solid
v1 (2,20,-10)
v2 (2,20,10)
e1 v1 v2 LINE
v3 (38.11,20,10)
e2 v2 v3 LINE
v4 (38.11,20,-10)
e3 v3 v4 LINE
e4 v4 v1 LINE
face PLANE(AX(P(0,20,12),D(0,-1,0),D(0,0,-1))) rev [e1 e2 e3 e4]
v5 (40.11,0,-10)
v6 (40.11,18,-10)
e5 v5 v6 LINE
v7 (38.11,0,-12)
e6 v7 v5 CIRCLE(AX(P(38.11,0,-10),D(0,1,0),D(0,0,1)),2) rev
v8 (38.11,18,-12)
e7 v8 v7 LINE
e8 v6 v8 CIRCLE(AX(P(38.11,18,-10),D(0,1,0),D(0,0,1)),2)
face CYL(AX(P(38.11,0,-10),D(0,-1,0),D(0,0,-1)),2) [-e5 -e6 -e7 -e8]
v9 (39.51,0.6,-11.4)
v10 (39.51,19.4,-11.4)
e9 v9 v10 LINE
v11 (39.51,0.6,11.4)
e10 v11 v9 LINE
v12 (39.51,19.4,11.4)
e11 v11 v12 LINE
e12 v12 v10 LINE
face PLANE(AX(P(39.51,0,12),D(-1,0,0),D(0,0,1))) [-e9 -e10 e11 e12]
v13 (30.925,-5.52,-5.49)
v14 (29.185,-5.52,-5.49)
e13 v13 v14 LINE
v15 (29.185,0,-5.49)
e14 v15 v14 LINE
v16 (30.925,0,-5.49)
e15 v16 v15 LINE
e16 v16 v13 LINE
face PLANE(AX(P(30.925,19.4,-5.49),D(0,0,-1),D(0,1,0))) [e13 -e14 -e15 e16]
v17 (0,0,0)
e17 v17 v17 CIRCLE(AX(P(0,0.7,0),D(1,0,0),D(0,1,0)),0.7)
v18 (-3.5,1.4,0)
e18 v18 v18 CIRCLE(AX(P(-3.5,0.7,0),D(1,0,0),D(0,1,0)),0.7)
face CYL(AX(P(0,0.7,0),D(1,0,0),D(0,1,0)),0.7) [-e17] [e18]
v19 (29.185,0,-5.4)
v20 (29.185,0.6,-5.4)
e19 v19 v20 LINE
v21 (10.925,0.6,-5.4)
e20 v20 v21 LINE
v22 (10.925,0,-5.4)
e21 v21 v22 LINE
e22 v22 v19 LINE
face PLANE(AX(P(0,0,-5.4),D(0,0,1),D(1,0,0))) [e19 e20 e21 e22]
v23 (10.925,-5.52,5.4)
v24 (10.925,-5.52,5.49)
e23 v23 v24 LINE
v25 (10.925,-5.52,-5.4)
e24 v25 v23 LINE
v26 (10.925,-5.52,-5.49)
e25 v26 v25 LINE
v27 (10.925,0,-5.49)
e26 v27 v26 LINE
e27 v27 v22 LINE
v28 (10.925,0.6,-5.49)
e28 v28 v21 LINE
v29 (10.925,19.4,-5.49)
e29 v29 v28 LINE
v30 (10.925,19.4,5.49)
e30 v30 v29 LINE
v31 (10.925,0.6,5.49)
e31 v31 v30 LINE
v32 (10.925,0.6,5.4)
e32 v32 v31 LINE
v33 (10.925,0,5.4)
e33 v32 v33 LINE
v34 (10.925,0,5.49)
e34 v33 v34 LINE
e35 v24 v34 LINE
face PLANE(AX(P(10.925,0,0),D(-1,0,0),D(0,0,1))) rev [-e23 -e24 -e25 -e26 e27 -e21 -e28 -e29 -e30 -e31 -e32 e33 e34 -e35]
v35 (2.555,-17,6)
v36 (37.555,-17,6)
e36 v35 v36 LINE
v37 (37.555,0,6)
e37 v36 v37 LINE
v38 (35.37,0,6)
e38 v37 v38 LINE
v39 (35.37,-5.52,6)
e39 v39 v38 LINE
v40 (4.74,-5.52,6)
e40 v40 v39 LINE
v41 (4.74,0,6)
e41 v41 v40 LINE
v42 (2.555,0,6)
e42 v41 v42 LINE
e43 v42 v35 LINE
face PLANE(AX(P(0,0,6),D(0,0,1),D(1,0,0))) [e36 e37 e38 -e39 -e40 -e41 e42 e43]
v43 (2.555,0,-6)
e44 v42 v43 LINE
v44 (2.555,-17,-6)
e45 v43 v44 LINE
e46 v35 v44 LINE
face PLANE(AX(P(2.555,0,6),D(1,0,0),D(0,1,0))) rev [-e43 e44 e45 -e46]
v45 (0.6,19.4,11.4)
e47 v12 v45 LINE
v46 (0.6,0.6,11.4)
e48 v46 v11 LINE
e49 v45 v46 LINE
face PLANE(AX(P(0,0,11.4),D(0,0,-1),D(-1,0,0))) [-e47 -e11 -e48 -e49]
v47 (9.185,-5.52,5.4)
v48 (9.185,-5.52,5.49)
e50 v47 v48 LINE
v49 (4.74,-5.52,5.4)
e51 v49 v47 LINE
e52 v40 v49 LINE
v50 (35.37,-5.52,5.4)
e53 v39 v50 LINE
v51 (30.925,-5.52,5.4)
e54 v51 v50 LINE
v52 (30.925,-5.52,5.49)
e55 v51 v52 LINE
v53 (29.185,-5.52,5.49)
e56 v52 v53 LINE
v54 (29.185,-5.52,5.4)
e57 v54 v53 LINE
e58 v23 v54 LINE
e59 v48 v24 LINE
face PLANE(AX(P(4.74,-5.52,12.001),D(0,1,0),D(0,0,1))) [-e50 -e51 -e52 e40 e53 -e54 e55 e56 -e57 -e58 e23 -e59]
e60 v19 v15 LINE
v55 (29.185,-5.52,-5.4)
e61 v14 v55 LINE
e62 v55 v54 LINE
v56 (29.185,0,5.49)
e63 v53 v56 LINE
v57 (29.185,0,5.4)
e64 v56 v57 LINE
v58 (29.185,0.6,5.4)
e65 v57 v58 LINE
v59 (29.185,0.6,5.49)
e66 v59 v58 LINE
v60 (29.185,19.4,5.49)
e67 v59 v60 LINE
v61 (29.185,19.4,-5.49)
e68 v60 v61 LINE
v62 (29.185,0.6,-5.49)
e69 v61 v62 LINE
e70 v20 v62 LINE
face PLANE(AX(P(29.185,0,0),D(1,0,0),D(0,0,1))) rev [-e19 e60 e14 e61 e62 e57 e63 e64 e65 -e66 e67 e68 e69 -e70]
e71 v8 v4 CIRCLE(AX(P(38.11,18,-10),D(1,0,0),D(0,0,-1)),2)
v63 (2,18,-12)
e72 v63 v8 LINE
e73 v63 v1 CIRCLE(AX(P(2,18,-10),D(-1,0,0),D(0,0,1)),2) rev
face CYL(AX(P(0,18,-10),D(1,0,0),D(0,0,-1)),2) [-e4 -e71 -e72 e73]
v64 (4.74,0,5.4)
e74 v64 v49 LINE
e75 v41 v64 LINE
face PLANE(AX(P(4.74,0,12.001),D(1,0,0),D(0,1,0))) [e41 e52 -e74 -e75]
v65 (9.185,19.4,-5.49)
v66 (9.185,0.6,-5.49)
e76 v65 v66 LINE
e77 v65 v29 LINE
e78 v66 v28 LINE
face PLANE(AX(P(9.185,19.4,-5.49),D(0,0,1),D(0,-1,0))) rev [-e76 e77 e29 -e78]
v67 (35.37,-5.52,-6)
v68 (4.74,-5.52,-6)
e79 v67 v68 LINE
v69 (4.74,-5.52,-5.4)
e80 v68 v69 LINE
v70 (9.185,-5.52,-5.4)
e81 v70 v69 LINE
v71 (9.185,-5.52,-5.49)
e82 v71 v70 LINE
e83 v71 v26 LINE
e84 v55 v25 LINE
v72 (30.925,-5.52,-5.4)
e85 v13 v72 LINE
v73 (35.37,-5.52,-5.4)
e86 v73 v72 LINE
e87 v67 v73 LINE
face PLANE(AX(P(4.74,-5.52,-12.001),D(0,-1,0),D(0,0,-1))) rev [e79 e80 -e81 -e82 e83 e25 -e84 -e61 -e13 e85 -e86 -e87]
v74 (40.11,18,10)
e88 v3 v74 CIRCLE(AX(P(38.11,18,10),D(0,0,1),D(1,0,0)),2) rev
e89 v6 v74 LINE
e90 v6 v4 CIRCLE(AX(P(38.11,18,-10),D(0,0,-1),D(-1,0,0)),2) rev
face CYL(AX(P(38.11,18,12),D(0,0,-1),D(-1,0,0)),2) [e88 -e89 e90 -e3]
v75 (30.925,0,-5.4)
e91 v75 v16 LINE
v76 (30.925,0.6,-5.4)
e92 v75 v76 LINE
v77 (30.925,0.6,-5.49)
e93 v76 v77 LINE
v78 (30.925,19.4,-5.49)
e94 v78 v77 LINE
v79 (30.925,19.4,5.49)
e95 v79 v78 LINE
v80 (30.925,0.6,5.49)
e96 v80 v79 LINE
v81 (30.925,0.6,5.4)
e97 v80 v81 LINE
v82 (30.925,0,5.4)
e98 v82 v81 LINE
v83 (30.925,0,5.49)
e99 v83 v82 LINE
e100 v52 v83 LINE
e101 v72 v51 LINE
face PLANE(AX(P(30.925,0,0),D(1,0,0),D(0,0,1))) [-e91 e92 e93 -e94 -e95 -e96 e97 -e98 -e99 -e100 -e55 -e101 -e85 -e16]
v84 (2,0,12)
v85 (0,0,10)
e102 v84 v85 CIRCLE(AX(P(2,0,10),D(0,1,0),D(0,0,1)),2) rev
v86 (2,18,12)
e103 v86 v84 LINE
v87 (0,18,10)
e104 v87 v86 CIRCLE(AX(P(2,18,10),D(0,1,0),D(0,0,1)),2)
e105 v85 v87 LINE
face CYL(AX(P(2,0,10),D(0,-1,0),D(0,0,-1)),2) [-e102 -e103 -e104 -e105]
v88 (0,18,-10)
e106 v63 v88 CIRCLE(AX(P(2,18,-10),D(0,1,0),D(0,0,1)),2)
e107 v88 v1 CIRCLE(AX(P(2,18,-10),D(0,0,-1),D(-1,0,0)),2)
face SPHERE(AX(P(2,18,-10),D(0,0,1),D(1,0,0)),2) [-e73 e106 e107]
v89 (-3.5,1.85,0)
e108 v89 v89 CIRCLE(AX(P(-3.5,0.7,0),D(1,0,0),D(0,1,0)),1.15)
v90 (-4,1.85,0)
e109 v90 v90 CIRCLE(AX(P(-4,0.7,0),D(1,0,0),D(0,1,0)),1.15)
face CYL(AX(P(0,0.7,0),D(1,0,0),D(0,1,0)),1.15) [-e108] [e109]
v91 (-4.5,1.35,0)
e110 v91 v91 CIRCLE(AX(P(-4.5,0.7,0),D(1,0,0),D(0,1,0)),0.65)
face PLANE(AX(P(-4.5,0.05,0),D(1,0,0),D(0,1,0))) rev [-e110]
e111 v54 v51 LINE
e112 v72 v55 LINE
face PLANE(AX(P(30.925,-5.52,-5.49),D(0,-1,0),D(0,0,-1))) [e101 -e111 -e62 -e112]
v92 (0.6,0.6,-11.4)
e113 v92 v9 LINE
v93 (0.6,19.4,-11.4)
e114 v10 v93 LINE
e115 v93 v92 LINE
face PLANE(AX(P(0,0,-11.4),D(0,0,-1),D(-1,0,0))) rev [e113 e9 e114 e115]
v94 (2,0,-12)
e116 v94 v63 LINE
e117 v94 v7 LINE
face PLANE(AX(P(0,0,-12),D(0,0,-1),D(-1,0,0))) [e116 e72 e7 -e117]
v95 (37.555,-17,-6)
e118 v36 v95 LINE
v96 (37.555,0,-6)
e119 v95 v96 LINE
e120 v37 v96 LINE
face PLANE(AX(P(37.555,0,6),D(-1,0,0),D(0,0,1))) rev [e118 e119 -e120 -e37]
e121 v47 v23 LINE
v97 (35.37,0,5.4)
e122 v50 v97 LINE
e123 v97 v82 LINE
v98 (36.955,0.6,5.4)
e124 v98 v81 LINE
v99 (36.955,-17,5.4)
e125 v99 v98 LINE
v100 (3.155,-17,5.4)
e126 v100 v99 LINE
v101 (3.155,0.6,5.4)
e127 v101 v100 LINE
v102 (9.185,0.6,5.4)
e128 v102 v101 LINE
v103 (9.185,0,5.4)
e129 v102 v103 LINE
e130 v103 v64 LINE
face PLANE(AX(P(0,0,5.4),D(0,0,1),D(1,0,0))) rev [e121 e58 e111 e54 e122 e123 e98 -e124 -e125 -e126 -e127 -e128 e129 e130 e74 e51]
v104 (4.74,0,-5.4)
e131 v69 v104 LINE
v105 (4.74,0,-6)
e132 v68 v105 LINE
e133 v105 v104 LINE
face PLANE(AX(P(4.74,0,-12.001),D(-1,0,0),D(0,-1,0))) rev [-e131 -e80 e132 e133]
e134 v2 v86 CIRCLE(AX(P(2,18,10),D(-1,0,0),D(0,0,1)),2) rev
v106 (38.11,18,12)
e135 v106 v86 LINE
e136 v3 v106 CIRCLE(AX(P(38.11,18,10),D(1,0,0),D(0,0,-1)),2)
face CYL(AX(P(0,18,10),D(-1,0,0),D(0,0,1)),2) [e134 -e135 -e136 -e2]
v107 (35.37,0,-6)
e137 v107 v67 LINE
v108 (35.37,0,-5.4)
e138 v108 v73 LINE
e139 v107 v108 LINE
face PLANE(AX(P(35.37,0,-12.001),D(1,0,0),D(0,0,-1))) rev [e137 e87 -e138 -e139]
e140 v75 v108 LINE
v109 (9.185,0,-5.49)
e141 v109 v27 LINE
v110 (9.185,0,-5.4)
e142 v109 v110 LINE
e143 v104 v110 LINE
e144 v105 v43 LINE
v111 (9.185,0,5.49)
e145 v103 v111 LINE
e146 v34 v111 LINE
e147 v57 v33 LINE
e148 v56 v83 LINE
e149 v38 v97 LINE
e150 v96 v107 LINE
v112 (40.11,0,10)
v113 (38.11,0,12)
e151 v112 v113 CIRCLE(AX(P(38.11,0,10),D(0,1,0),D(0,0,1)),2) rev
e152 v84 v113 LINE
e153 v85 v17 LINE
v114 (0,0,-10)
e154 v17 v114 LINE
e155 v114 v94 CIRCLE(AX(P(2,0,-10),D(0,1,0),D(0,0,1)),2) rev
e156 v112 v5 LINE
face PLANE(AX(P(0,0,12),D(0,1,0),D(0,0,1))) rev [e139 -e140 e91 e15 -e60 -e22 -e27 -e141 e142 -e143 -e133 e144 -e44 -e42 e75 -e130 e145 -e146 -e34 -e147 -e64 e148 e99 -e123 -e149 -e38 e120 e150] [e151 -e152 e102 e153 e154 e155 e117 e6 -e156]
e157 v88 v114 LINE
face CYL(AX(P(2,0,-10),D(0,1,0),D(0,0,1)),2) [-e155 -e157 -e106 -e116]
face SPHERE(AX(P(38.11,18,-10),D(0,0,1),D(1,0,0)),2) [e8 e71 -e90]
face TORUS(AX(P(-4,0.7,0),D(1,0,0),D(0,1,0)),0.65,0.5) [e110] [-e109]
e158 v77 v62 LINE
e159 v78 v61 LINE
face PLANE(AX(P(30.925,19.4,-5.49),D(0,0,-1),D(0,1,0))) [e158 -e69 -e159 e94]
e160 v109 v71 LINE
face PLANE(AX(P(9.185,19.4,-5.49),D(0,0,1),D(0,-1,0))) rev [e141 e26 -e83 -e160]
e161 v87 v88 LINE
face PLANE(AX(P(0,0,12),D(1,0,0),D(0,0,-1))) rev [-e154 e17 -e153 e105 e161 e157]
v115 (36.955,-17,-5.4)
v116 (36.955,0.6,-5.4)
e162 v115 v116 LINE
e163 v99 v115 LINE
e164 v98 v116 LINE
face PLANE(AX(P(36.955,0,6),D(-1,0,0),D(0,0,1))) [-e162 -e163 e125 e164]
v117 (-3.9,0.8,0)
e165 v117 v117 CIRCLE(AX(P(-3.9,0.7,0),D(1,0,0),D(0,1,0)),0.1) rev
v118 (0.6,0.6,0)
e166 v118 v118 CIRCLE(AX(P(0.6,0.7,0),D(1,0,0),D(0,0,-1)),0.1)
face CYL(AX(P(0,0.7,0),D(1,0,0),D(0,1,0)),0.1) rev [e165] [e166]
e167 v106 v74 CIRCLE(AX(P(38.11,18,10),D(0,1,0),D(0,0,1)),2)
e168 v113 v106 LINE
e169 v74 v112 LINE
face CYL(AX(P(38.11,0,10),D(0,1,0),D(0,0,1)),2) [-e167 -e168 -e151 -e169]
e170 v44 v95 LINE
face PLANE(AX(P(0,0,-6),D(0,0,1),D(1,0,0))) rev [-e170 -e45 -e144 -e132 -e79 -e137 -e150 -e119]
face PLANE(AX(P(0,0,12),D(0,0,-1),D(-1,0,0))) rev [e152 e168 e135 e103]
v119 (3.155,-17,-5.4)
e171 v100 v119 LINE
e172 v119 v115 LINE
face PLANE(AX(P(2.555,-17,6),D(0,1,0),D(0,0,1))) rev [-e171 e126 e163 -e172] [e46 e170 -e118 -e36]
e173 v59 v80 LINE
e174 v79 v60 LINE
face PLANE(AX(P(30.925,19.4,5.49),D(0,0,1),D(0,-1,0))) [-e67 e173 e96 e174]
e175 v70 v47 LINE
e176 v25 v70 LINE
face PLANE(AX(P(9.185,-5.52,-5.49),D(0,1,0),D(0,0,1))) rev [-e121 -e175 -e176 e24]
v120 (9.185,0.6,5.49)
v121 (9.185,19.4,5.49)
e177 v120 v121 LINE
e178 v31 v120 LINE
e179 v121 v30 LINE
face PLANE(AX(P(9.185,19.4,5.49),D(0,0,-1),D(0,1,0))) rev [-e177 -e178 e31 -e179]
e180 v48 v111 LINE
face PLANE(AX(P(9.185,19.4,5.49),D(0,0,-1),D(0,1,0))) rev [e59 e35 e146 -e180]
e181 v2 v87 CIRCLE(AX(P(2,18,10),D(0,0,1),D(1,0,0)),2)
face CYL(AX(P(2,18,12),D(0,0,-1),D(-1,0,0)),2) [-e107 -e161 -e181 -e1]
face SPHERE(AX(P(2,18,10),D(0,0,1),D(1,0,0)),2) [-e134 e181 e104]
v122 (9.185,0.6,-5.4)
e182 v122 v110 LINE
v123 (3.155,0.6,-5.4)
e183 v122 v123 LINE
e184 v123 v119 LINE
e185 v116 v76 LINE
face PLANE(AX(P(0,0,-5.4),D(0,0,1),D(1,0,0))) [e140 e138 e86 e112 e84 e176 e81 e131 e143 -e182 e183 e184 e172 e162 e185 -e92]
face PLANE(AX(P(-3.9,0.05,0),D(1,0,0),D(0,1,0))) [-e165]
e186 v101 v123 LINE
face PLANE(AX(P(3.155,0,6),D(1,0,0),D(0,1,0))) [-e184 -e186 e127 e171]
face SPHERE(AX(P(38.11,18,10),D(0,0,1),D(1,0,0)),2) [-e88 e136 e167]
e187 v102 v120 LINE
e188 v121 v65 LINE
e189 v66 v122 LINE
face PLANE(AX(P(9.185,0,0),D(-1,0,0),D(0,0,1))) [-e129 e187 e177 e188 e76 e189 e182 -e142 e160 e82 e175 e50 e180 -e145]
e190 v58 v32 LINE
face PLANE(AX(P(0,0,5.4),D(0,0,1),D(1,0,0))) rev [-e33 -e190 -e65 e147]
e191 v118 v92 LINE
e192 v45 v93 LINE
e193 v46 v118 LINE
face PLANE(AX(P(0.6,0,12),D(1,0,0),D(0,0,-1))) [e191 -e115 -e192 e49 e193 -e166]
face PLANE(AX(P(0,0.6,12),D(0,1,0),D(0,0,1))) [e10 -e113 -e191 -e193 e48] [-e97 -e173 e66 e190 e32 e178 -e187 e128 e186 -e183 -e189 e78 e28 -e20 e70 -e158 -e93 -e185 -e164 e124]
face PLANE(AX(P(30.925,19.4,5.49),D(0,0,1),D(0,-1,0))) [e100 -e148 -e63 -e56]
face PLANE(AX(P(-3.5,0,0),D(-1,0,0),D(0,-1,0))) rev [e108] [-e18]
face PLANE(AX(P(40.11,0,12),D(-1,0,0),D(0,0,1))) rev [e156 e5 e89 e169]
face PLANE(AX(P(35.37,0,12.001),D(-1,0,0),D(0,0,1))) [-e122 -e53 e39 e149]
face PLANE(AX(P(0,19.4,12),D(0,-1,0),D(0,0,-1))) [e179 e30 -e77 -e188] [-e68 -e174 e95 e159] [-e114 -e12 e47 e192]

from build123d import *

# Parameters (mm, degrees)
SKETCH1_W                      = 40.11
SKETCH1_H                      = 20
BOSS_EXTRUDE1_DEPTH            = 12
SKETCH2_W                      = 35
SKETCH2_H                      = 17
BOSS_EXTRUDE2_DEPTH            = 6
SHELL1_START                   = 3.155
SHELL1_DEPTH                   = 33.8
SHELL1_START_2                 = 0.6
SHELL1_2_OUTLINE_W             = 18.8
SHELL1_2_OUTLINE_H             = 22.8
SHELL1_2_DEPTH                 = 38.91
SHELL1_START_3                 = -3.9
SHELL1_3_OUTLINE_R             = 0.1
SHELL1_3_DEPTH                 = 4.5
CUT_EXTRUDE1_REACH             = 48.398
SKETCH4_W                      = 30.63
SKETCH4_H                      = 5.52
CUT_EXTRUDE1_DIRECTION_2_REACH = 48.398
BOSS_EXTRUDE3_START            = 9.13
SKETCH5_W                      = 10.98
SKETCH5_H                      = 24.92
BOSS_EXTRUDE3_DEPTH            = 1.74
FILLET1_R                      = 2


# Read off the part's stored shape, not the designer's step: Shell1
with BuildPart() as part:
    # Sketch1 → Boss-Extrude1 (new, symmetric)
    with BuildSketch(Plane.XY):
        with Locations((20.055, 10)):
            Rectangle(SKETCH1_W, SKETCH1_H)
    extrude(amount=BOSS_EXTRUDE1_DEPTH, both=True)

    # Sketch2 → Boss-Extrude2 (add, symmetric)
    with BuildSketch(Plane.XY):
        with Locations((20.055, -8.5)):
            Rectangle(SKETCH2_W, SKETCH2_H)
    extrude(amount=BOSS_EXTRUDE2_DEPTH, both=True)

    # Sketch3 → Revolve1 (revolve)
    with BuildSketch(Plane.XY, mode=Mode.PRIVATE) as revolve1_sk:
        with BuildLine():
            Line((0, 0), (-3.5, 0))
            Line((-3.5, 0), (-3.5, -0.45))
            Line((-3.5, -0.45), (-4, -0.45))
            ThreePointArc((-4, -0.45), (-4.353553391, -0.303553391), (-4.5, 0.05))
            Line((-4.5, 0.05), (-4.5, 0.7))
            Line((-4.5, 0.7), (0, 0.7))
            Line((0, 0.7), (0, 0))
        make_face()
    revolve(revolve1_sk.sketch.rotate(Axis((0, 0.7, 0), (-1, 0, 0)), 180), axis=Axis((0, 0.7, 0), (-1, 0, 0)))

    # Shell1 outline → Shell1 (cut)
    with BuildSketch(Plane.YZ.offset(SHELL1_START)):
        Polygon((0.6, -5.4), (0.6, -11.4), (19.4, -11.4), (19.4, 11.4), (0.6, 11.4), (0.6, 5.4), (-17, 5.4), (-17, -5.4), align=None)
    extrude(amount=SHELL1_DEPTH, mode=Mode.SUBTRACT)

    # Shell1 2 outline → Shell1 2 (cut)
    with BuildSketch(Plane.YZ.offset(SHELL1_START_2)):
        with Locations((10, 0)):
            Rectangle(SHELL1_2_OUTLINE_W, SHELL1_2_OUTLINE_H)
    extrude(amount=SHELL1_2_DEPTH, mode=Mode.SUBTRACT)

    # Shell1 3 outline → Shell1 3 (cut)
    with BuildSketch(Plane.YZ.offset(SHELL1_START_3)):
        with Locations((0.7, 0)):
            Circle(SHELL1_3_OUTLINE_R)
    extrude(amount=SHELL1_3_DEPTH, mode=Mode.SUBTRACT)

    # Sketch4 → Cut-Extrude1 (cut, up to next)
    with BuildSketch(Plane.XY, mode=Mode.PRIVATE) as cut_extrude1_sk1:
        with Locations((20.055, -2.76)):
            Rectangle(SKETCH4_W, SKETCH4_H)
    cut_extrude1_tool1 = extrude(cut_extrude1_sk1.sketch, amount=-CUT_EXTRUDE1_REACH, mode=Mode.PRIVATE) & part.part
    add(cut_extrude1_tool1.solids().sort_by_distance((20.055, -2.76, 0))[0], mode=Mode.SUBTRACT)

    # Sketch4 → Cut-Extrude1 direction 2 (cut, up to next)
    with BuildSketch(Plane.XY, mode=Mode.PRIVATE) as cut_extrude1_direction_2_sk1:
        with Locations((20.055, -2.76)):
            Rectangle(SKETCH4_W, SKETCH4_H)
    cut_extrude1_direction_2_tool1 = extrude(cut_extrude1_direction_2_sk1.sketch, amount=CUT_EXTRUDE1_DIRECTION_2_REACH, mode=Mode.PRIVATE) & part.part
    add(cut_extrude1_direction_2_tool1.solids().sort_by_distance((20.055, -2.76, 0))[0], mode=Mode.SUBTRACT)

    # Sketch5 → Boss-Extrude3 (add)
    with BuildSketch(Plane.ZY.offset(-20.055).offset(BOSS_EXTRUDE3_START)):
        with Locations((0, 6.94)):
            Rectangle(SKETCH5_W, SKETCH5_H)
    boss_extrude3 = extrude(amount=BOSS_EXTRUDE3_DEPTH)

    # Mirror1: Boss-Extrude3 across plane
    add(boss_extrude3.mirror(Plane.ZY.offset(-20.055)))

    # Fillet1
    fillet1_edges = [part.edges().sort_by_distance(p)[0] for p in [
        (40.11, 10, 12),
        (20.055, 20, 12),
        (0, 10, 12),
        (20.055, 20, -12),
        (40.11, 10, -12),
        (0, 10, -12),
        (0, 20, 0),
        (40.11, 20, 0),
    ]]
    fillet(fillet1_edges, radius=FILLET1_R)


solid = part.part
